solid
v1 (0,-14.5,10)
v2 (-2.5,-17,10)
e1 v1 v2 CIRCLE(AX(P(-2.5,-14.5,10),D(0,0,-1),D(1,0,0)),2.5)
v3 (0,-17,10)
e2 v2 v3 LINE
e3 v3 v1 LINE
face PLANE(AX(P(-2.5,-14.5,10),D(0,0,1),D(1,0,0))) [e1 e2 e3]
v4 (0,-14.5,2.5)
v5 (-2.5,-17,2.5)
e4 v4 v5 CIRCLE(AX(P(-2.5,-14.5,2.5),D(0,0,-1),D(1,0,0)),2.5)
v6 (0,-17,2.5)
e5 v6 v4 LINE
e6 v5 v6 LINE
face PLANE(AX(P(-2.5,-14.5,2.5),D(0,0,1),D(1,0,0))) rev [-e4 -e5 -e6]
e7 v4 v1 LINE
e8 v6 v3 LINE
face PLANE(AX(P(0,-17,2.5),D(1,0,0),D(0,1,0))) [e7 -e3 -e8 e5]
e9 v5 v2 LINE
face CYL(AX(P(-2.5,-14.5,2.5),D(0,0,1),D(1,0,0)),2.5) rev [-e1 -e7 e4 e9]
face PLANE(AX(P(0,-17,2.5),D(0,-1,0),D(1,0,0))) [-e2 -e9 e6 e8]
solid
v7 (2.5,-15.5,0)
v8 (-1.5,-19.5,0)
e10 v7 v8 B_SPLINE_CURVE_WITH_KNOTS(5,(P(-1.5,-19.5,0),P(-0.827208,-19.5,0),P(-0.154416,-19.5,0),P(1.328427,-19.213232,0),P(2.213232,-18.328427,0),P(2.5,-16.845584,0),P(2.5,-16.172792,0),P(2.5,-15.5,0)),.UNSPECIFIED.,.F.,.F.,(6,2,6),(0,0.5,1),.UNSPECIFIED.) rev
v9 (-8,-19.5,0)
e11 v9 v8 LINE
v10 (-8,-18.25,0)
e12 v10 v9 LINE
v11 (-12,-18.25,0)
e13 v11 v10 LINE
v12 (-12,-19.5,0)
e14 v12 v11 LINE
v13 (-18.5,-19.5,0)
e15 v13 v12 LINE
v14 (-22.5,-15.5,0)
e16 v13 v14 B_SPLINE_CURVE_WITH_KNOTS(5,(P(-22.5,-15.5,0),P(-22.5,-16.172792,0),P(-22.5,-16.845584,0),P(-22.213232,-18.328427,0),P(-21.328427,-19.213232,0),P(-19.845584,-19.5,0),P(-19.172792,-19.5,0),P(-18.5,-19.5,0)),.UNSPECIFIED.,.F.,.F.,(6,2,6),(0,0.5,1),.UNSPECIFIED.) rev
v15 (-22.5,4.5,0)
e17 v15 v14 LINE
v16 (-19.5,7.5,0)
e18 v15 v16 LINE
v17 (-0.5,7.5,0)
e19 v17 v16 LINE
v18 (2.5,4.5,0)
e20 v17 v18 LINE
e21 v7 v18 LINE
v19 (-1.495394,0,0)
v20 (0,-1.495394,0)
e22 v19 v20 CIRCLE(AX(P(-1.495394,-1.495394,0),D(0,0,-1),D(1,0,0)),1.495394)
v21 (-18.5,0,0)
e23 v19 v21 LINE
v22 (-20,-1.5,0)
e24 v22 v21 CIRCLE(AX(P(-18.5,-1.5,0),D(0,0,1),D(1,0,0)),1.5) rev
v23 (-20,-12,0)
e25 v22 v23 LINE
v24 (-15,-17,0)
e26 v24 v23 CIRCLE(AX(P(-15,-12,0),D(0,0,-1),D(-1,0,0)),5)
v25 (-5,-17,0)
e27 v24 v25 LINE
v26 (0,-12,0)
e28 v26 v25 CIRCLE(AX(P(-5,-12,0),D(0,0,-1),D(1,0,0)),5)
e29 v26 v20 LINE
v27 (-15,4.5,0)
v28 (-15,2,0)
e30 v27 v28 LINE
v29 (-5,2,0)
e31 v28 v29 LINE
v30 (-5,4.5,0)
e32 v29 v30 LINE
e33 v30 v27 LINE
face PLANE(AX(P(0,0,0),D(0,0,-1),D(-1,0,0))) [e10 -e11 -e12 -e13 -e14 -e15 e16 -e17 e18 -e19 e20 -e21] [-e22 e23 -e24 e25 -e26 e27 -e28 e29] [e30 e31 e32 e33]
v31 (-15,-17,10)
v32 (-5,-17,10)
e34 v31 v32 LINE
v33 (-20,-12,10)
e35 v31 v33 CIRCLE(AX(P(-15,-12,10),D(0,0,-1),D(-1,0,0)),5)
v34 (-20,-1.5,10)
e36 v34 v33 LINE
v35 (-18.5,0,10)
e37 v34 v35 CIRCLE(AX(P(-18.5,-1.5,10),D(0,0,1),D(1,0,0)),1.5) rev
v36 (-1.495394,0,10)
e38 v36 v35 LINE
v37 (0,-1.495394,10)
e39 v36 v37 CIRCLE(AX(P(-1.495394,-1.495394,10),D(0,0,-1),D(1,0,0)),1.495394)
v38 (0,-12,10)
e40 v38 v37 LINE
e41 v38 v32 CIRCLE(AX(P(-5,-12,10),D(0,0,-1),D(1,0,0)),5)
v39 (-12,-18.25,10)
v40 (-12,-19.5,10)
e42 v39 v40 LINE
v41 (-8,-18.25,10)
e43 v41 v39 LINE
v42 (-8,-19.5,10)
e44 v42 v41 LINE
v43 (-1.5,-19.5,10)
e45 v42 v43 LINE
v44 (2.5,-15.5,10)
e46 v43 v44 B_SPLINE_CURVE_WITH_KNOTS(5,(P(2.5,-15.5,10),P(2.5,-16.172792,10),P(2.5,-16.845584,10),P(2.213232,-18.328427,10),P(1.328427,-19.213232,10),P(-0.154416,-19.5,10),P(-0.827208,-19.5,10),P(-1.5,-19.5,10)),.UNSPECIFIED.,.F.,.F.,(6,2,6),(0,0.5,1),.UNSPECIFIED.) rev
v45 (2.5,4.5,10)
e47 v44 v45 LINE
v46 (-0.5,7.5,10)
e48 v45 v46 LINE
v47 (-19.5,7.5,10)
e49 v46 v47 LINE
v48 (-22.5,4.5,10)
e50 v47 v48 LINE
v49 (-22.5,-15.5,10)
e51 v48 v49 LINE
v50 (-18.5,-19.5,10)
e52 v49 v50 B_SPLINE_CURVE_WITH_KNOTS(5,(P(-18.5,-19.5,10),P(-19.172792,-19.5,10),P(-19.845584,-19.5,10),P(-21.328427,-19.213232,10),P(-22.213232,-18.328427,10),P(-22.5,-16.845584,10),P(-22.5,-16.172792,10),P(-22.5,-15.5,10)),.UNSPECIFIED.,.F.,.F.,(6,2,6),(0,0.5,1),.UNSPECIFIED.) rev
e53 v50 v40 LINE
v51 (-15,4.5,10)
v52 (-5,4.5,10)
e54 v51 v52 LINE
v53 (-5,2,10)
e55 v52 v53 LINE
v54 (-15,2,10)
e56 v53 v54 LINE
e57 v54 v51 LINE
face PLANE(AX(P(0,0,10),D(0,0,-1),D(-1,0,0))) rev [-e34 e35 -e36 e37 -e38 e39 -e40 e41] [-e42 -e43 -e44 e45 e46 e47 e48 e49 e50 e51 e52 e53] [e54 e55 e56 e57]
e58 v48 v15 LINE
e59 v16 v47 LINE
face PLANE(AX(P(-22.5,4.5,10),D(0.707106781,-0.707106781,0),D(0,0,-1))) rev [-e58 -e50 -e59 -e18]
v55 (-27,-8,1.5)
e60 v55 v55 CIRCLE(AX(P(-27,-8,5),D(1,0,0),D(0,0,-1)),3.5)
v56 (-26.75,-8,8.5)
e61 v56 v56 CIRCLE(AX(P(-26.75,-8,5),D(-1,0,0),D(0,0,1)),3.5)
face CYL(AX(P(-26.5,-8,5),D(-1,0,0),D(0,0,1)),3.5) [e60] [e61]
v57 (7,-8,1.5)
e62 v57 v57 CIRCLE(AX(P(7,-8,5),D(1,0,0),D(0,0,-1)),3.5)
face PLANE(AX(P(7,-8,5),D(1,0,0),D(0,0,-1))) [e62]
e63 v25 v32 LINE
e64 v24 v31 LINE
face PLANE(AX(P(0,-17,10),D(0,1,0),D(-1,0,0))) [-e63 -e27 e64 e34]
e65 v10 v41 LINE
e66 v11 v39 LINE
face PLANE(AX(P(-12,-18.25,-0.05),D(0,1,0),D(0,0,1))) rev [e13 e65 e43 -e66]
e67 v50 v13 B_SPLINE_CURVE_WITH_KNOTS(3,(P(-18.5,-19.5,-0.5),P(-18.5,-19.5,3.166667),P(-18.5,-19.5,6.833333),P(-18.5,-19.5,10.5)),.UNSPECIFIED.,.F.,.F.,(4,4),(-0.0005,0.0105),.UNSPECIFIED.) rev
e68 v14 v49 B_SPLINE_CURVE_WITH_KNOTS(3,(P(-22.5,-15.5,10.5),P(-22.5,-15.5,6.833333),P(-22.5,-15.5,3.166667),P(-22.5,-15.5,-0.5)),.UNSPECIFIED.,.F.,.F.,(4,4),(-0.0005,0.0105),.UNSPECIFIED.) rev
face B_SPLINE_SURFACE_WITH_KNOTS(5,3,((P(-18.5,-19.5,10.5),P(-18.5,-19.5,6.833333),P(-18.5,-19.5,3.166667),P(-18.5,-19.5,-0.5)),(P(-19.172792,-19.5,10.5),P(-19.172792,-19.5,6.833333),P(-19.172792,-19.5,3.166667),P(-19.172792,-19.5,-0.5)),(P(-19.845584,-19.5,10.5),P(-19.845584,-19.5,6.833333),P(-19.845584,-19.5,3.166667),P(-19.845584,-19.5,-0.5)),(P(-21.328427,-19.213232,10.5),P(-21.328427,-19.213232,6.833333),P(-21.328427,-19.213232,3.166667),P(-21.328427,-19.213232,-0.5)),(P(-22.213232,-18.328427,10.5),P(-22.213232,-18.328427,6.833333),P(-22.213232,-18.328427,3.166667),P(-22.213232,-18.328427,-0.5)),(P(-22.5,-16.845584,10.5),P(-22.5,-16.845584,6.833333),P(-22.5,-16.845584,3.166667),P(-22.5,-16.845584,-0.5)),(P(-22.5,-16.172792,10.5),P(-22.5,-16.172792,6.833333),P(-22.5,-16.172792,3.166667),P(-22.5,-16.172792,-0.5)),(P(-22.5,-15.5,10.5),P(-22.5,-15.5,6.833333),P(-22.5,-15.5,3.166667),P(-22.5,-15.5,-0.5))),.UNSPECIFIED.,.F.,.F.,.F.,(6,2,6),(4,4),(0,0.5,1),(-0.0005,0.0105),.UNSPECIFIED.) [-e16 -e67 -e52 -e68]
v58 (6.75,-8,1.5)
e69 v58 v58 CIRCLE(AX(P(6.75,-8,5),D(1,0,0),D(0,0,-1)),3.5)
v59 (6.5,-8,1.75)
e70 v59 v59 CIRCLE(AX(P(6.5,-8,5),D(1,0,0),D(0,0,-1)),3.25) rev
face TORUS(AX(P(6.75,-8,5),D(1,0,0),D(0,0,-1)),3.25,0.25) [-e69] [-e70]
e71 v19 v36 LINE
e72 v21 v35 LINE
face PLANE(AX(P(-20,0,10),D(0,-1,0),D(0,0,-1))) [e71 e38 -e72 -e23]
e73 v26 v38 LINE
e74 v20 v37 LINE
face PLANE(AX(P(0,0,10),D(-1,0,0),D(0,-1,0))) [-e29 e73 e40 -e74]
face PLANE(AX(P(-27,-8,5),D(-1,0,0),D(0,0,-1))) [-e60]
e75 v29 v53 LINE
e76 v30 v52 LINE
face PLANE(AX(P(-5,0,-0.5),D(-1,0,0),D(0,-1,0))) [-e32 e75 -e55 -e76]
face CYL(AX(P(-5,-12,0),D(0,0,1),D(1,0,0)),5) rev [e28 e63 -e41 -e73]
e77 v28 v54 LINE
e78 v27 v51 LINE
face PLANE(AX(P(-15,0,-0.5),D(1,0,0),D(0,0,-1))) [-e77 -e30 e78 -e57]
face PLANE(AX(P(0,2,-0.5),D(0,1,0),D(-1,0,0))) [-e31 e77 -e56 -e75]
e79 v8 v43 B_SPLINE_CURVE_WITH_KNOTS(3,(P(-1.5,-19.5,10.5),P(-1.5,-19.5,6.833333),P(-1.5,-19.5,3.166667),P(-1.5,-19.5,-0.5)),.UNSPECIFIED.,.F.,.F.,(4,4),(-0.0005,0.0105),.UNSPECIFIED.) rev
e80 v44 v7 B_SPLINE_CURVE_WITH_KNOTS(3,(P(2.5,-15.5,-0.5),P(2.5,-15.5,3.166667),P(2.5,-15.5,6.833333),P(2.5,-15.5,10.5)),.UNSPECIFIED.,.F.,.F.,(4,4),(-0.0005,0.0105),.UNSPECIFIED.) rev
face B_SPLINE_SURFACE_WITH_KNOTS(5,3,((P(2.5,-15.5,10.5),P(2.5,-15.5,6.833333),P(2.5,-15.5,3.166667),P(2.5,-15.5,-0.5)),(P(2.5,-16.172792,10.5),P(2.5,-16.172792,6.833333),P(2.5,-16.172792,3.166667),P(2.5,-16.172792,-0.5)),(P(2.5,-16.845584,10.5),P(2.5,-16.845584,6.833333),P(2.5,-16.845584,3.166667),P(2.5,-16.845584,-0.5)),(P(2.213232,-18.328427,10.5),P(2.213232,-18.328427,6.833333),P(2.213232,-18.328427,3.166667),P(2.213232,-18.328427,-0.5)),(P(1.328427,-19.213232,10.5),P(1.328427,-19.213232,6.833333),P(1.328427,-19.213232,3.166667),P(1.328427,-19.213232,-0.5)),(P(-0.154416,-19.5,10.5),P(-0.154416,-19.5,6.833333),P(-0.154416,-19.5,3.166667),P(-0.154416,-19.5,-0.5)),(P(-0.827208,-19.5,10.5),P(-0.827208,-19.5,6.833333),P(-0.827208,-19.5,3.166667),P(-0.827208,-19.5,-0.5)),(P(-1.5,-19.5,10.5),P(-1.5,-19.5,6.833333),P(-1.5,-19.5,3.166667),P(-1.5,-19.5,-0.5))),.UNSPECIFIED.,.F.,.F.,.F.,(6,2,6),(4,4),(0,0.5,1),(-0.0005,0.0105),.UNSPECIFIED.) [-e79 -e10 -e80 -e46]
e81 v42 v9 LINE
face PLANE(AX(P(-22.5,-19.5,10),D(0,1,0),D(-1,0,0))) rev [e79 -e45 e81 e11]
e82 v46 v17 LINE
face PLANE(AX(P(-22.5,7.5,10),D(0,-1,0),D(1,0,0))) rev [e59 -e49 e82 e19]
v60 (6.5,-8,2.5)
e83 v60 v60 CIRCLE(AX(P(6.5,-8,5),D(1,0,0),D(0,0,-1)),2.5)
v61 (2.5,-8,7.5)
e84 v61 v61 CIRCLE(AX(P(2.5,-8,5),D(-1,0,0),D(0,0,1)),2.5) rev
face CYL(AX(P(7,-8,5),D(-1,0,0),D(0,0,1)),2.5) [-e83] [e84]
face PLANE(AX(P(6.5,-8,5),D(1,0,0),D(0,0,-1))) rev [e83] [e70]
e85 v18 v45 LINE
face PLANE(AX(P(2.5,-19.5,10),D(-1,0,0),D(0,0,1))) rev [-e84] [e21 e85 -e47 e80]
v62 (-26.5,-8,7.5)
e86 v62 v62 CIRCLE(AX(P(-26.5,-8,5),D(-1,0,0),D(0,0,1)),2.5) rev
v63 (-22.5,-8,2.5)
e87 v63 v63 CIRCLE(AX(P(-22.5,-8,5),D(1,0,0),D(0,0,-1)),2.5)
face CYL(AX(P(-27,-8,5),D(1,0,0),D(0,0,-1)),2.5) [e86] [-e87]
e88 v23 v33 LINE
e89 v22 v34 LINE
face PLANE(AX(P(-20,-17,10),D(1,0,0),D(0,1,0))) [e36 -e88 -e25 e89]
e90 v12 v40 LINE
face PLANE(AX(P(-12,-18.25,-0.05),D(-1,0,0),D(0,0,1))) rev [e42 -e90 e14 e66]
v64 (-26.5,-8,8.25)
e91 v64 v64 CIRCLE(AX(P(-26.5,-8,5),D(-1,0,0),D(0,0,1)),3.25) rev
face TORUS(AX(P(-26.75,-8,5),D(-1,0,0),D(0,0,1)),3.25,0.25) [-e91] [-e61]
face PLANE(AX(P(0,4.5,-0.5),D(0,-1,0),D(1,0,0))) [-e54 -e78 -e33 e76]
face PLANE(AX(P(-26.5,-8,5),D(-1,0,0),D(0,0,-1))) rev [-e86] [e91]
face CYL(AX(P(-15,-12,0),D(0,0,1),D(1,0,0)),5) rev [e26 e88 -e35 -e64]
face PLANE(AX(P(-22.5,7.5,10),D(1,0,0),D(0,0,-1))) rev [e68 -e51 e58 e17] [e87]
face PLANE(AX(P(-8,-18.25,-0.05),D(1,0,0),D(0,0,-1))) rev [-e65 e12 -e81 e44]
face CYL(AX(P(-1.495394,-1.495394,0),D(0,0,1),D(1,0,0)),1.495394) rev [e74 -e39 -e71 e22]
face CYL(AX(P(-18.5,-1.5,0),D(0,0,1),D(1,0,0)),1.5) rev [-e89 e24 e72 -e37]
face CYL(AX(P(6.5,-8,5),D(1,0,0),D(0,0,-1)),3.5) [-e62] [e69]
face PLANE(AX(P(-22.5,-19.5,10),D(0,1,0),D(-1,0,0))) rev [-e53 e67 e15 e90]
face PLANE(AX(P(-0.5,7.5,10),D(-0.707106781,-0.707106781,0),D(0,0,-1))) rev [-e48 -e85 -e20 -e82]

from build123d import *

# Parameters (mm, degrees)
SKETCH1_W            = 25
SKETCH1_H            = 27
SKETCH1_W_2          = 20
SKETCH1_H_2          = 17
BOSS_EXTRUDE1_DEPTH  = 10
FILLET1_SIZE         = 4
BOSS_EXTRUDE2_DEPTH  = 10
BOSS_EXTRUDE3_DEPTH  = 10
BOSS_EXTRUDE4_DEPTH  = 7.5
BOSS_EXTRUDE5_DEPTH  = 10
CHAMFER1_SIZE        = 3
SKETCH8_W            = 10
SKETCH8_H            = 2.5
CUT_EXTRUDE1_DEPTH   = 10.5
SKETCH19_W           = 4
SKETCH19_H           = 1.25
CUT_EXTRUDE5_DEPTH   = 32.408597715
SKETCH20_R           = 2.5
BOSS_EXTRUDE10_DEPTH = 4.5
SKETCH21_R           = 3.5
BOSS_EXTRUDE11_DEPTH = 0.5
FILLET2_R            = 0.25
FILLET3_R            = 0.25


with BuildPart() as part:
    # Sketch1 → Boss-Extrude1 (new body)
    with BuildSketch(Plane.XY):
        with Locations((-10, -6)):
            Rectangle(SKETCH1_W, SKETCH1_H)
        with Locations((-10, -8.5)):
            Rectangle(SKETCH1_W_2, SKETCH1_H_2, mode=Mode.SUBTRACT)
    extrude(amount=BOSS_EXTRUDE1_DEPTH)

    # Fillet1
    # a fillet whose section is not a circle: 4 mm, written as the material it takes off along each edge
    with BuildSketch(Plane(origin=(-22.5, -19.5, -10), x_dir=(0, 1, 0), z_dir=(0, 0, 1)), Plane(origin=(2.5, -19.5, -10), x_dir=(-1, 0, 0), z_dir=(0, 0, 1))) as fillet1_piece_1:
        with BuildLine():
            add(Edge.make_bspline([(FILLET1_SIZE, 0), (FILLET1_SIZE * 0.831801948466, 0), (FILLET1_SIZE * 0.663603896932, 0), (FILLET1_SIZE * 0.292893218813, -FILLET1_SIZE * 0.0716919198361), (FILLET1_SIZE * 0.0716919198361, -FILLET1_SIZE * 0.292893218813), (0, -FILLET1_SIZE * 0.663603896932), (0, -FILLET1_SIZE * 0.831801948466), (0, -FILLET1_SIZE)], knots=[0, 0, 0, 0, 0, 0, 0.5, 0.5, 1, 1, 1, 1, 1, 1], degree=5))
            Line((0, -FILLET1_SIZE), (0, 0))
            Line((0, 0), (FILLET1_SIZE, 0))
        make_face()
    extrude(amount=30, mode=Mode.SUBTRACT)

    # Sketch3 → Boss-Extrude2 (add)
    with BuildSketch(Plane.XY.offset(10)):
        with BuildLine():
            Line((-18.5, 0), (-20, 0))
            Line((-20, 0), (-20, -1.5))
            ThreePointArc((-20, -1.5), (-19.560660172, -0.439339828), (-18.5, 0))
        make_face()
    extrude(amount=-BOSS_EXTRUDE2_DEPTH)

    # Sketch4 → Boss-Extrude3 (add)
    with BuildSketch(Plane.XY.offset(10)):
        with BuildLine():
            Line((0, 0), (0, -1.495394009))
            ThreePointArc((0, -1.495394009), (-0.437990765, -0.437990765), (-1.495394009, 0))
            Line((-1.495394009, 0), (0, 0))
        make_face()
    extrude(amount=-BOSS_EXTRUDE3_DEPTH)

    # Sketch7 → Boss-Extrude5 (add)
    with BuildSketch(Plane.XY.offset(10)):
        with BuildLine():
            Line((-20, -17), (-15, -17))
            ThreePointArc((-15, -17), (-18.535533906, -15.535533906), (-20, -12))
            Line((-20, -12), (-20, -17))
        make_face()
        with BuildLine():
            Line((0, -17), (-5, -17))
            ThreePointArc((-5, -17), (-1.464466094, -15.535533906), (0, -12))
            Line((0, -12), (0, -17))
        make_face()
    extrude(amount=-BOSS_EXTRUDE5_DEPTH)

    # Chamfer1
    chamfer1_edges = [part.edges().sort_by_distance(p)[0] for p in [
        (2.5, 7.5, 5),
        (-22.5, 7.5, 5),
    ]]
    chamfer(chamfer1_edges, length=CHAMFER1_SIZE)

    # Sketch8 → Cut-Extrude1 (cut)
    with BuildSketch(Plane.XY.offset(10)):
        with Locations((-10, 3.25)):
            Rectangle(SKETCH8_W, SKETCH8_H)
    extrude(amount=-CUT_EXTRUDE1_DEPTH, mode=Mode.SUBTRACT)

    # Sketch19 → Cut-Extrude5 (cut, through all)
    with BuildSketch(Plane.XY.offset(10)):
        with Locations((-10, -18.875)):
            Rectangle(SKETCH19_W, SKETCH19_H)
    extrude(amount=-CUT_EXTRUDE5_DEPTH, mode=Mode.SUBTRACT)

    # Sketch20 → Boss-Extrude10 (add)
    with BuildSketch(Plane(origin=(2.5, 0, 0), x_dir=(0, 0, -1), z_dir=(1, 0, 0))):
        with Locations(Location((-5, -8, 0), (0, 0, 180))):
            Circle(SKETCH20_R)
    boss_extrude10 = extrude(amount=BOSS_EXTRUDE10_DEPTH)

    # Sketch21 → Boss-Extrude11 (add)
    with BuildSketch(Plane(origin=(7, 0, 0), x_dir=(0, 0, -1), z_dir=(1, 0, 0))):
        with Locations((-5, -8)):
            Circle(SKETCH21_R)
    boss_extrude11 = extrude(amount=-BOSS_EXTRUDE11_DEPTH)

    # Fillet2
    fillet2_edges = [part.edges().sort_by_distance(p)[0] for p in [
        (6.5, -8, 8.5),
    ]]
    fillet(fillet2_edges, radius=FILLET2_R)

    # Mirror1: Boss-Extrude10, Boss-Extrude11 across plane
    add(boss_extrude10.mirror(Plane.ZY.offset(10)))
    add(boss_extrude11.mirror(Plane.ZY.offset(10)))

    # Fillet3
    fillet3_edges = [part.edges().sort_by_distance(p)[0] for p in [
        (-26.5, -8, 8.5),
    ]]
    fillet(fillet3_edges, radius=FILLET3_R)


with BuildPart() as body_2:
    # Sketch6 → Boss-Extrude4 (new body)
    with BuildSketch(Plane.XY.offset(10)):
        with BuildLine():
            Line((0, -17), (0, -14.5))
            ThreePointArc((0, -14.5), (-0.732233047, -16.267766953), (-2.5, -17))
            Line((-2.5, -17), (0, -17))
        make_face()
    extrude(amount=-BOSS_EXTRUDE4_DEPTH)


solid = Compound([part.part, body_2.part])
